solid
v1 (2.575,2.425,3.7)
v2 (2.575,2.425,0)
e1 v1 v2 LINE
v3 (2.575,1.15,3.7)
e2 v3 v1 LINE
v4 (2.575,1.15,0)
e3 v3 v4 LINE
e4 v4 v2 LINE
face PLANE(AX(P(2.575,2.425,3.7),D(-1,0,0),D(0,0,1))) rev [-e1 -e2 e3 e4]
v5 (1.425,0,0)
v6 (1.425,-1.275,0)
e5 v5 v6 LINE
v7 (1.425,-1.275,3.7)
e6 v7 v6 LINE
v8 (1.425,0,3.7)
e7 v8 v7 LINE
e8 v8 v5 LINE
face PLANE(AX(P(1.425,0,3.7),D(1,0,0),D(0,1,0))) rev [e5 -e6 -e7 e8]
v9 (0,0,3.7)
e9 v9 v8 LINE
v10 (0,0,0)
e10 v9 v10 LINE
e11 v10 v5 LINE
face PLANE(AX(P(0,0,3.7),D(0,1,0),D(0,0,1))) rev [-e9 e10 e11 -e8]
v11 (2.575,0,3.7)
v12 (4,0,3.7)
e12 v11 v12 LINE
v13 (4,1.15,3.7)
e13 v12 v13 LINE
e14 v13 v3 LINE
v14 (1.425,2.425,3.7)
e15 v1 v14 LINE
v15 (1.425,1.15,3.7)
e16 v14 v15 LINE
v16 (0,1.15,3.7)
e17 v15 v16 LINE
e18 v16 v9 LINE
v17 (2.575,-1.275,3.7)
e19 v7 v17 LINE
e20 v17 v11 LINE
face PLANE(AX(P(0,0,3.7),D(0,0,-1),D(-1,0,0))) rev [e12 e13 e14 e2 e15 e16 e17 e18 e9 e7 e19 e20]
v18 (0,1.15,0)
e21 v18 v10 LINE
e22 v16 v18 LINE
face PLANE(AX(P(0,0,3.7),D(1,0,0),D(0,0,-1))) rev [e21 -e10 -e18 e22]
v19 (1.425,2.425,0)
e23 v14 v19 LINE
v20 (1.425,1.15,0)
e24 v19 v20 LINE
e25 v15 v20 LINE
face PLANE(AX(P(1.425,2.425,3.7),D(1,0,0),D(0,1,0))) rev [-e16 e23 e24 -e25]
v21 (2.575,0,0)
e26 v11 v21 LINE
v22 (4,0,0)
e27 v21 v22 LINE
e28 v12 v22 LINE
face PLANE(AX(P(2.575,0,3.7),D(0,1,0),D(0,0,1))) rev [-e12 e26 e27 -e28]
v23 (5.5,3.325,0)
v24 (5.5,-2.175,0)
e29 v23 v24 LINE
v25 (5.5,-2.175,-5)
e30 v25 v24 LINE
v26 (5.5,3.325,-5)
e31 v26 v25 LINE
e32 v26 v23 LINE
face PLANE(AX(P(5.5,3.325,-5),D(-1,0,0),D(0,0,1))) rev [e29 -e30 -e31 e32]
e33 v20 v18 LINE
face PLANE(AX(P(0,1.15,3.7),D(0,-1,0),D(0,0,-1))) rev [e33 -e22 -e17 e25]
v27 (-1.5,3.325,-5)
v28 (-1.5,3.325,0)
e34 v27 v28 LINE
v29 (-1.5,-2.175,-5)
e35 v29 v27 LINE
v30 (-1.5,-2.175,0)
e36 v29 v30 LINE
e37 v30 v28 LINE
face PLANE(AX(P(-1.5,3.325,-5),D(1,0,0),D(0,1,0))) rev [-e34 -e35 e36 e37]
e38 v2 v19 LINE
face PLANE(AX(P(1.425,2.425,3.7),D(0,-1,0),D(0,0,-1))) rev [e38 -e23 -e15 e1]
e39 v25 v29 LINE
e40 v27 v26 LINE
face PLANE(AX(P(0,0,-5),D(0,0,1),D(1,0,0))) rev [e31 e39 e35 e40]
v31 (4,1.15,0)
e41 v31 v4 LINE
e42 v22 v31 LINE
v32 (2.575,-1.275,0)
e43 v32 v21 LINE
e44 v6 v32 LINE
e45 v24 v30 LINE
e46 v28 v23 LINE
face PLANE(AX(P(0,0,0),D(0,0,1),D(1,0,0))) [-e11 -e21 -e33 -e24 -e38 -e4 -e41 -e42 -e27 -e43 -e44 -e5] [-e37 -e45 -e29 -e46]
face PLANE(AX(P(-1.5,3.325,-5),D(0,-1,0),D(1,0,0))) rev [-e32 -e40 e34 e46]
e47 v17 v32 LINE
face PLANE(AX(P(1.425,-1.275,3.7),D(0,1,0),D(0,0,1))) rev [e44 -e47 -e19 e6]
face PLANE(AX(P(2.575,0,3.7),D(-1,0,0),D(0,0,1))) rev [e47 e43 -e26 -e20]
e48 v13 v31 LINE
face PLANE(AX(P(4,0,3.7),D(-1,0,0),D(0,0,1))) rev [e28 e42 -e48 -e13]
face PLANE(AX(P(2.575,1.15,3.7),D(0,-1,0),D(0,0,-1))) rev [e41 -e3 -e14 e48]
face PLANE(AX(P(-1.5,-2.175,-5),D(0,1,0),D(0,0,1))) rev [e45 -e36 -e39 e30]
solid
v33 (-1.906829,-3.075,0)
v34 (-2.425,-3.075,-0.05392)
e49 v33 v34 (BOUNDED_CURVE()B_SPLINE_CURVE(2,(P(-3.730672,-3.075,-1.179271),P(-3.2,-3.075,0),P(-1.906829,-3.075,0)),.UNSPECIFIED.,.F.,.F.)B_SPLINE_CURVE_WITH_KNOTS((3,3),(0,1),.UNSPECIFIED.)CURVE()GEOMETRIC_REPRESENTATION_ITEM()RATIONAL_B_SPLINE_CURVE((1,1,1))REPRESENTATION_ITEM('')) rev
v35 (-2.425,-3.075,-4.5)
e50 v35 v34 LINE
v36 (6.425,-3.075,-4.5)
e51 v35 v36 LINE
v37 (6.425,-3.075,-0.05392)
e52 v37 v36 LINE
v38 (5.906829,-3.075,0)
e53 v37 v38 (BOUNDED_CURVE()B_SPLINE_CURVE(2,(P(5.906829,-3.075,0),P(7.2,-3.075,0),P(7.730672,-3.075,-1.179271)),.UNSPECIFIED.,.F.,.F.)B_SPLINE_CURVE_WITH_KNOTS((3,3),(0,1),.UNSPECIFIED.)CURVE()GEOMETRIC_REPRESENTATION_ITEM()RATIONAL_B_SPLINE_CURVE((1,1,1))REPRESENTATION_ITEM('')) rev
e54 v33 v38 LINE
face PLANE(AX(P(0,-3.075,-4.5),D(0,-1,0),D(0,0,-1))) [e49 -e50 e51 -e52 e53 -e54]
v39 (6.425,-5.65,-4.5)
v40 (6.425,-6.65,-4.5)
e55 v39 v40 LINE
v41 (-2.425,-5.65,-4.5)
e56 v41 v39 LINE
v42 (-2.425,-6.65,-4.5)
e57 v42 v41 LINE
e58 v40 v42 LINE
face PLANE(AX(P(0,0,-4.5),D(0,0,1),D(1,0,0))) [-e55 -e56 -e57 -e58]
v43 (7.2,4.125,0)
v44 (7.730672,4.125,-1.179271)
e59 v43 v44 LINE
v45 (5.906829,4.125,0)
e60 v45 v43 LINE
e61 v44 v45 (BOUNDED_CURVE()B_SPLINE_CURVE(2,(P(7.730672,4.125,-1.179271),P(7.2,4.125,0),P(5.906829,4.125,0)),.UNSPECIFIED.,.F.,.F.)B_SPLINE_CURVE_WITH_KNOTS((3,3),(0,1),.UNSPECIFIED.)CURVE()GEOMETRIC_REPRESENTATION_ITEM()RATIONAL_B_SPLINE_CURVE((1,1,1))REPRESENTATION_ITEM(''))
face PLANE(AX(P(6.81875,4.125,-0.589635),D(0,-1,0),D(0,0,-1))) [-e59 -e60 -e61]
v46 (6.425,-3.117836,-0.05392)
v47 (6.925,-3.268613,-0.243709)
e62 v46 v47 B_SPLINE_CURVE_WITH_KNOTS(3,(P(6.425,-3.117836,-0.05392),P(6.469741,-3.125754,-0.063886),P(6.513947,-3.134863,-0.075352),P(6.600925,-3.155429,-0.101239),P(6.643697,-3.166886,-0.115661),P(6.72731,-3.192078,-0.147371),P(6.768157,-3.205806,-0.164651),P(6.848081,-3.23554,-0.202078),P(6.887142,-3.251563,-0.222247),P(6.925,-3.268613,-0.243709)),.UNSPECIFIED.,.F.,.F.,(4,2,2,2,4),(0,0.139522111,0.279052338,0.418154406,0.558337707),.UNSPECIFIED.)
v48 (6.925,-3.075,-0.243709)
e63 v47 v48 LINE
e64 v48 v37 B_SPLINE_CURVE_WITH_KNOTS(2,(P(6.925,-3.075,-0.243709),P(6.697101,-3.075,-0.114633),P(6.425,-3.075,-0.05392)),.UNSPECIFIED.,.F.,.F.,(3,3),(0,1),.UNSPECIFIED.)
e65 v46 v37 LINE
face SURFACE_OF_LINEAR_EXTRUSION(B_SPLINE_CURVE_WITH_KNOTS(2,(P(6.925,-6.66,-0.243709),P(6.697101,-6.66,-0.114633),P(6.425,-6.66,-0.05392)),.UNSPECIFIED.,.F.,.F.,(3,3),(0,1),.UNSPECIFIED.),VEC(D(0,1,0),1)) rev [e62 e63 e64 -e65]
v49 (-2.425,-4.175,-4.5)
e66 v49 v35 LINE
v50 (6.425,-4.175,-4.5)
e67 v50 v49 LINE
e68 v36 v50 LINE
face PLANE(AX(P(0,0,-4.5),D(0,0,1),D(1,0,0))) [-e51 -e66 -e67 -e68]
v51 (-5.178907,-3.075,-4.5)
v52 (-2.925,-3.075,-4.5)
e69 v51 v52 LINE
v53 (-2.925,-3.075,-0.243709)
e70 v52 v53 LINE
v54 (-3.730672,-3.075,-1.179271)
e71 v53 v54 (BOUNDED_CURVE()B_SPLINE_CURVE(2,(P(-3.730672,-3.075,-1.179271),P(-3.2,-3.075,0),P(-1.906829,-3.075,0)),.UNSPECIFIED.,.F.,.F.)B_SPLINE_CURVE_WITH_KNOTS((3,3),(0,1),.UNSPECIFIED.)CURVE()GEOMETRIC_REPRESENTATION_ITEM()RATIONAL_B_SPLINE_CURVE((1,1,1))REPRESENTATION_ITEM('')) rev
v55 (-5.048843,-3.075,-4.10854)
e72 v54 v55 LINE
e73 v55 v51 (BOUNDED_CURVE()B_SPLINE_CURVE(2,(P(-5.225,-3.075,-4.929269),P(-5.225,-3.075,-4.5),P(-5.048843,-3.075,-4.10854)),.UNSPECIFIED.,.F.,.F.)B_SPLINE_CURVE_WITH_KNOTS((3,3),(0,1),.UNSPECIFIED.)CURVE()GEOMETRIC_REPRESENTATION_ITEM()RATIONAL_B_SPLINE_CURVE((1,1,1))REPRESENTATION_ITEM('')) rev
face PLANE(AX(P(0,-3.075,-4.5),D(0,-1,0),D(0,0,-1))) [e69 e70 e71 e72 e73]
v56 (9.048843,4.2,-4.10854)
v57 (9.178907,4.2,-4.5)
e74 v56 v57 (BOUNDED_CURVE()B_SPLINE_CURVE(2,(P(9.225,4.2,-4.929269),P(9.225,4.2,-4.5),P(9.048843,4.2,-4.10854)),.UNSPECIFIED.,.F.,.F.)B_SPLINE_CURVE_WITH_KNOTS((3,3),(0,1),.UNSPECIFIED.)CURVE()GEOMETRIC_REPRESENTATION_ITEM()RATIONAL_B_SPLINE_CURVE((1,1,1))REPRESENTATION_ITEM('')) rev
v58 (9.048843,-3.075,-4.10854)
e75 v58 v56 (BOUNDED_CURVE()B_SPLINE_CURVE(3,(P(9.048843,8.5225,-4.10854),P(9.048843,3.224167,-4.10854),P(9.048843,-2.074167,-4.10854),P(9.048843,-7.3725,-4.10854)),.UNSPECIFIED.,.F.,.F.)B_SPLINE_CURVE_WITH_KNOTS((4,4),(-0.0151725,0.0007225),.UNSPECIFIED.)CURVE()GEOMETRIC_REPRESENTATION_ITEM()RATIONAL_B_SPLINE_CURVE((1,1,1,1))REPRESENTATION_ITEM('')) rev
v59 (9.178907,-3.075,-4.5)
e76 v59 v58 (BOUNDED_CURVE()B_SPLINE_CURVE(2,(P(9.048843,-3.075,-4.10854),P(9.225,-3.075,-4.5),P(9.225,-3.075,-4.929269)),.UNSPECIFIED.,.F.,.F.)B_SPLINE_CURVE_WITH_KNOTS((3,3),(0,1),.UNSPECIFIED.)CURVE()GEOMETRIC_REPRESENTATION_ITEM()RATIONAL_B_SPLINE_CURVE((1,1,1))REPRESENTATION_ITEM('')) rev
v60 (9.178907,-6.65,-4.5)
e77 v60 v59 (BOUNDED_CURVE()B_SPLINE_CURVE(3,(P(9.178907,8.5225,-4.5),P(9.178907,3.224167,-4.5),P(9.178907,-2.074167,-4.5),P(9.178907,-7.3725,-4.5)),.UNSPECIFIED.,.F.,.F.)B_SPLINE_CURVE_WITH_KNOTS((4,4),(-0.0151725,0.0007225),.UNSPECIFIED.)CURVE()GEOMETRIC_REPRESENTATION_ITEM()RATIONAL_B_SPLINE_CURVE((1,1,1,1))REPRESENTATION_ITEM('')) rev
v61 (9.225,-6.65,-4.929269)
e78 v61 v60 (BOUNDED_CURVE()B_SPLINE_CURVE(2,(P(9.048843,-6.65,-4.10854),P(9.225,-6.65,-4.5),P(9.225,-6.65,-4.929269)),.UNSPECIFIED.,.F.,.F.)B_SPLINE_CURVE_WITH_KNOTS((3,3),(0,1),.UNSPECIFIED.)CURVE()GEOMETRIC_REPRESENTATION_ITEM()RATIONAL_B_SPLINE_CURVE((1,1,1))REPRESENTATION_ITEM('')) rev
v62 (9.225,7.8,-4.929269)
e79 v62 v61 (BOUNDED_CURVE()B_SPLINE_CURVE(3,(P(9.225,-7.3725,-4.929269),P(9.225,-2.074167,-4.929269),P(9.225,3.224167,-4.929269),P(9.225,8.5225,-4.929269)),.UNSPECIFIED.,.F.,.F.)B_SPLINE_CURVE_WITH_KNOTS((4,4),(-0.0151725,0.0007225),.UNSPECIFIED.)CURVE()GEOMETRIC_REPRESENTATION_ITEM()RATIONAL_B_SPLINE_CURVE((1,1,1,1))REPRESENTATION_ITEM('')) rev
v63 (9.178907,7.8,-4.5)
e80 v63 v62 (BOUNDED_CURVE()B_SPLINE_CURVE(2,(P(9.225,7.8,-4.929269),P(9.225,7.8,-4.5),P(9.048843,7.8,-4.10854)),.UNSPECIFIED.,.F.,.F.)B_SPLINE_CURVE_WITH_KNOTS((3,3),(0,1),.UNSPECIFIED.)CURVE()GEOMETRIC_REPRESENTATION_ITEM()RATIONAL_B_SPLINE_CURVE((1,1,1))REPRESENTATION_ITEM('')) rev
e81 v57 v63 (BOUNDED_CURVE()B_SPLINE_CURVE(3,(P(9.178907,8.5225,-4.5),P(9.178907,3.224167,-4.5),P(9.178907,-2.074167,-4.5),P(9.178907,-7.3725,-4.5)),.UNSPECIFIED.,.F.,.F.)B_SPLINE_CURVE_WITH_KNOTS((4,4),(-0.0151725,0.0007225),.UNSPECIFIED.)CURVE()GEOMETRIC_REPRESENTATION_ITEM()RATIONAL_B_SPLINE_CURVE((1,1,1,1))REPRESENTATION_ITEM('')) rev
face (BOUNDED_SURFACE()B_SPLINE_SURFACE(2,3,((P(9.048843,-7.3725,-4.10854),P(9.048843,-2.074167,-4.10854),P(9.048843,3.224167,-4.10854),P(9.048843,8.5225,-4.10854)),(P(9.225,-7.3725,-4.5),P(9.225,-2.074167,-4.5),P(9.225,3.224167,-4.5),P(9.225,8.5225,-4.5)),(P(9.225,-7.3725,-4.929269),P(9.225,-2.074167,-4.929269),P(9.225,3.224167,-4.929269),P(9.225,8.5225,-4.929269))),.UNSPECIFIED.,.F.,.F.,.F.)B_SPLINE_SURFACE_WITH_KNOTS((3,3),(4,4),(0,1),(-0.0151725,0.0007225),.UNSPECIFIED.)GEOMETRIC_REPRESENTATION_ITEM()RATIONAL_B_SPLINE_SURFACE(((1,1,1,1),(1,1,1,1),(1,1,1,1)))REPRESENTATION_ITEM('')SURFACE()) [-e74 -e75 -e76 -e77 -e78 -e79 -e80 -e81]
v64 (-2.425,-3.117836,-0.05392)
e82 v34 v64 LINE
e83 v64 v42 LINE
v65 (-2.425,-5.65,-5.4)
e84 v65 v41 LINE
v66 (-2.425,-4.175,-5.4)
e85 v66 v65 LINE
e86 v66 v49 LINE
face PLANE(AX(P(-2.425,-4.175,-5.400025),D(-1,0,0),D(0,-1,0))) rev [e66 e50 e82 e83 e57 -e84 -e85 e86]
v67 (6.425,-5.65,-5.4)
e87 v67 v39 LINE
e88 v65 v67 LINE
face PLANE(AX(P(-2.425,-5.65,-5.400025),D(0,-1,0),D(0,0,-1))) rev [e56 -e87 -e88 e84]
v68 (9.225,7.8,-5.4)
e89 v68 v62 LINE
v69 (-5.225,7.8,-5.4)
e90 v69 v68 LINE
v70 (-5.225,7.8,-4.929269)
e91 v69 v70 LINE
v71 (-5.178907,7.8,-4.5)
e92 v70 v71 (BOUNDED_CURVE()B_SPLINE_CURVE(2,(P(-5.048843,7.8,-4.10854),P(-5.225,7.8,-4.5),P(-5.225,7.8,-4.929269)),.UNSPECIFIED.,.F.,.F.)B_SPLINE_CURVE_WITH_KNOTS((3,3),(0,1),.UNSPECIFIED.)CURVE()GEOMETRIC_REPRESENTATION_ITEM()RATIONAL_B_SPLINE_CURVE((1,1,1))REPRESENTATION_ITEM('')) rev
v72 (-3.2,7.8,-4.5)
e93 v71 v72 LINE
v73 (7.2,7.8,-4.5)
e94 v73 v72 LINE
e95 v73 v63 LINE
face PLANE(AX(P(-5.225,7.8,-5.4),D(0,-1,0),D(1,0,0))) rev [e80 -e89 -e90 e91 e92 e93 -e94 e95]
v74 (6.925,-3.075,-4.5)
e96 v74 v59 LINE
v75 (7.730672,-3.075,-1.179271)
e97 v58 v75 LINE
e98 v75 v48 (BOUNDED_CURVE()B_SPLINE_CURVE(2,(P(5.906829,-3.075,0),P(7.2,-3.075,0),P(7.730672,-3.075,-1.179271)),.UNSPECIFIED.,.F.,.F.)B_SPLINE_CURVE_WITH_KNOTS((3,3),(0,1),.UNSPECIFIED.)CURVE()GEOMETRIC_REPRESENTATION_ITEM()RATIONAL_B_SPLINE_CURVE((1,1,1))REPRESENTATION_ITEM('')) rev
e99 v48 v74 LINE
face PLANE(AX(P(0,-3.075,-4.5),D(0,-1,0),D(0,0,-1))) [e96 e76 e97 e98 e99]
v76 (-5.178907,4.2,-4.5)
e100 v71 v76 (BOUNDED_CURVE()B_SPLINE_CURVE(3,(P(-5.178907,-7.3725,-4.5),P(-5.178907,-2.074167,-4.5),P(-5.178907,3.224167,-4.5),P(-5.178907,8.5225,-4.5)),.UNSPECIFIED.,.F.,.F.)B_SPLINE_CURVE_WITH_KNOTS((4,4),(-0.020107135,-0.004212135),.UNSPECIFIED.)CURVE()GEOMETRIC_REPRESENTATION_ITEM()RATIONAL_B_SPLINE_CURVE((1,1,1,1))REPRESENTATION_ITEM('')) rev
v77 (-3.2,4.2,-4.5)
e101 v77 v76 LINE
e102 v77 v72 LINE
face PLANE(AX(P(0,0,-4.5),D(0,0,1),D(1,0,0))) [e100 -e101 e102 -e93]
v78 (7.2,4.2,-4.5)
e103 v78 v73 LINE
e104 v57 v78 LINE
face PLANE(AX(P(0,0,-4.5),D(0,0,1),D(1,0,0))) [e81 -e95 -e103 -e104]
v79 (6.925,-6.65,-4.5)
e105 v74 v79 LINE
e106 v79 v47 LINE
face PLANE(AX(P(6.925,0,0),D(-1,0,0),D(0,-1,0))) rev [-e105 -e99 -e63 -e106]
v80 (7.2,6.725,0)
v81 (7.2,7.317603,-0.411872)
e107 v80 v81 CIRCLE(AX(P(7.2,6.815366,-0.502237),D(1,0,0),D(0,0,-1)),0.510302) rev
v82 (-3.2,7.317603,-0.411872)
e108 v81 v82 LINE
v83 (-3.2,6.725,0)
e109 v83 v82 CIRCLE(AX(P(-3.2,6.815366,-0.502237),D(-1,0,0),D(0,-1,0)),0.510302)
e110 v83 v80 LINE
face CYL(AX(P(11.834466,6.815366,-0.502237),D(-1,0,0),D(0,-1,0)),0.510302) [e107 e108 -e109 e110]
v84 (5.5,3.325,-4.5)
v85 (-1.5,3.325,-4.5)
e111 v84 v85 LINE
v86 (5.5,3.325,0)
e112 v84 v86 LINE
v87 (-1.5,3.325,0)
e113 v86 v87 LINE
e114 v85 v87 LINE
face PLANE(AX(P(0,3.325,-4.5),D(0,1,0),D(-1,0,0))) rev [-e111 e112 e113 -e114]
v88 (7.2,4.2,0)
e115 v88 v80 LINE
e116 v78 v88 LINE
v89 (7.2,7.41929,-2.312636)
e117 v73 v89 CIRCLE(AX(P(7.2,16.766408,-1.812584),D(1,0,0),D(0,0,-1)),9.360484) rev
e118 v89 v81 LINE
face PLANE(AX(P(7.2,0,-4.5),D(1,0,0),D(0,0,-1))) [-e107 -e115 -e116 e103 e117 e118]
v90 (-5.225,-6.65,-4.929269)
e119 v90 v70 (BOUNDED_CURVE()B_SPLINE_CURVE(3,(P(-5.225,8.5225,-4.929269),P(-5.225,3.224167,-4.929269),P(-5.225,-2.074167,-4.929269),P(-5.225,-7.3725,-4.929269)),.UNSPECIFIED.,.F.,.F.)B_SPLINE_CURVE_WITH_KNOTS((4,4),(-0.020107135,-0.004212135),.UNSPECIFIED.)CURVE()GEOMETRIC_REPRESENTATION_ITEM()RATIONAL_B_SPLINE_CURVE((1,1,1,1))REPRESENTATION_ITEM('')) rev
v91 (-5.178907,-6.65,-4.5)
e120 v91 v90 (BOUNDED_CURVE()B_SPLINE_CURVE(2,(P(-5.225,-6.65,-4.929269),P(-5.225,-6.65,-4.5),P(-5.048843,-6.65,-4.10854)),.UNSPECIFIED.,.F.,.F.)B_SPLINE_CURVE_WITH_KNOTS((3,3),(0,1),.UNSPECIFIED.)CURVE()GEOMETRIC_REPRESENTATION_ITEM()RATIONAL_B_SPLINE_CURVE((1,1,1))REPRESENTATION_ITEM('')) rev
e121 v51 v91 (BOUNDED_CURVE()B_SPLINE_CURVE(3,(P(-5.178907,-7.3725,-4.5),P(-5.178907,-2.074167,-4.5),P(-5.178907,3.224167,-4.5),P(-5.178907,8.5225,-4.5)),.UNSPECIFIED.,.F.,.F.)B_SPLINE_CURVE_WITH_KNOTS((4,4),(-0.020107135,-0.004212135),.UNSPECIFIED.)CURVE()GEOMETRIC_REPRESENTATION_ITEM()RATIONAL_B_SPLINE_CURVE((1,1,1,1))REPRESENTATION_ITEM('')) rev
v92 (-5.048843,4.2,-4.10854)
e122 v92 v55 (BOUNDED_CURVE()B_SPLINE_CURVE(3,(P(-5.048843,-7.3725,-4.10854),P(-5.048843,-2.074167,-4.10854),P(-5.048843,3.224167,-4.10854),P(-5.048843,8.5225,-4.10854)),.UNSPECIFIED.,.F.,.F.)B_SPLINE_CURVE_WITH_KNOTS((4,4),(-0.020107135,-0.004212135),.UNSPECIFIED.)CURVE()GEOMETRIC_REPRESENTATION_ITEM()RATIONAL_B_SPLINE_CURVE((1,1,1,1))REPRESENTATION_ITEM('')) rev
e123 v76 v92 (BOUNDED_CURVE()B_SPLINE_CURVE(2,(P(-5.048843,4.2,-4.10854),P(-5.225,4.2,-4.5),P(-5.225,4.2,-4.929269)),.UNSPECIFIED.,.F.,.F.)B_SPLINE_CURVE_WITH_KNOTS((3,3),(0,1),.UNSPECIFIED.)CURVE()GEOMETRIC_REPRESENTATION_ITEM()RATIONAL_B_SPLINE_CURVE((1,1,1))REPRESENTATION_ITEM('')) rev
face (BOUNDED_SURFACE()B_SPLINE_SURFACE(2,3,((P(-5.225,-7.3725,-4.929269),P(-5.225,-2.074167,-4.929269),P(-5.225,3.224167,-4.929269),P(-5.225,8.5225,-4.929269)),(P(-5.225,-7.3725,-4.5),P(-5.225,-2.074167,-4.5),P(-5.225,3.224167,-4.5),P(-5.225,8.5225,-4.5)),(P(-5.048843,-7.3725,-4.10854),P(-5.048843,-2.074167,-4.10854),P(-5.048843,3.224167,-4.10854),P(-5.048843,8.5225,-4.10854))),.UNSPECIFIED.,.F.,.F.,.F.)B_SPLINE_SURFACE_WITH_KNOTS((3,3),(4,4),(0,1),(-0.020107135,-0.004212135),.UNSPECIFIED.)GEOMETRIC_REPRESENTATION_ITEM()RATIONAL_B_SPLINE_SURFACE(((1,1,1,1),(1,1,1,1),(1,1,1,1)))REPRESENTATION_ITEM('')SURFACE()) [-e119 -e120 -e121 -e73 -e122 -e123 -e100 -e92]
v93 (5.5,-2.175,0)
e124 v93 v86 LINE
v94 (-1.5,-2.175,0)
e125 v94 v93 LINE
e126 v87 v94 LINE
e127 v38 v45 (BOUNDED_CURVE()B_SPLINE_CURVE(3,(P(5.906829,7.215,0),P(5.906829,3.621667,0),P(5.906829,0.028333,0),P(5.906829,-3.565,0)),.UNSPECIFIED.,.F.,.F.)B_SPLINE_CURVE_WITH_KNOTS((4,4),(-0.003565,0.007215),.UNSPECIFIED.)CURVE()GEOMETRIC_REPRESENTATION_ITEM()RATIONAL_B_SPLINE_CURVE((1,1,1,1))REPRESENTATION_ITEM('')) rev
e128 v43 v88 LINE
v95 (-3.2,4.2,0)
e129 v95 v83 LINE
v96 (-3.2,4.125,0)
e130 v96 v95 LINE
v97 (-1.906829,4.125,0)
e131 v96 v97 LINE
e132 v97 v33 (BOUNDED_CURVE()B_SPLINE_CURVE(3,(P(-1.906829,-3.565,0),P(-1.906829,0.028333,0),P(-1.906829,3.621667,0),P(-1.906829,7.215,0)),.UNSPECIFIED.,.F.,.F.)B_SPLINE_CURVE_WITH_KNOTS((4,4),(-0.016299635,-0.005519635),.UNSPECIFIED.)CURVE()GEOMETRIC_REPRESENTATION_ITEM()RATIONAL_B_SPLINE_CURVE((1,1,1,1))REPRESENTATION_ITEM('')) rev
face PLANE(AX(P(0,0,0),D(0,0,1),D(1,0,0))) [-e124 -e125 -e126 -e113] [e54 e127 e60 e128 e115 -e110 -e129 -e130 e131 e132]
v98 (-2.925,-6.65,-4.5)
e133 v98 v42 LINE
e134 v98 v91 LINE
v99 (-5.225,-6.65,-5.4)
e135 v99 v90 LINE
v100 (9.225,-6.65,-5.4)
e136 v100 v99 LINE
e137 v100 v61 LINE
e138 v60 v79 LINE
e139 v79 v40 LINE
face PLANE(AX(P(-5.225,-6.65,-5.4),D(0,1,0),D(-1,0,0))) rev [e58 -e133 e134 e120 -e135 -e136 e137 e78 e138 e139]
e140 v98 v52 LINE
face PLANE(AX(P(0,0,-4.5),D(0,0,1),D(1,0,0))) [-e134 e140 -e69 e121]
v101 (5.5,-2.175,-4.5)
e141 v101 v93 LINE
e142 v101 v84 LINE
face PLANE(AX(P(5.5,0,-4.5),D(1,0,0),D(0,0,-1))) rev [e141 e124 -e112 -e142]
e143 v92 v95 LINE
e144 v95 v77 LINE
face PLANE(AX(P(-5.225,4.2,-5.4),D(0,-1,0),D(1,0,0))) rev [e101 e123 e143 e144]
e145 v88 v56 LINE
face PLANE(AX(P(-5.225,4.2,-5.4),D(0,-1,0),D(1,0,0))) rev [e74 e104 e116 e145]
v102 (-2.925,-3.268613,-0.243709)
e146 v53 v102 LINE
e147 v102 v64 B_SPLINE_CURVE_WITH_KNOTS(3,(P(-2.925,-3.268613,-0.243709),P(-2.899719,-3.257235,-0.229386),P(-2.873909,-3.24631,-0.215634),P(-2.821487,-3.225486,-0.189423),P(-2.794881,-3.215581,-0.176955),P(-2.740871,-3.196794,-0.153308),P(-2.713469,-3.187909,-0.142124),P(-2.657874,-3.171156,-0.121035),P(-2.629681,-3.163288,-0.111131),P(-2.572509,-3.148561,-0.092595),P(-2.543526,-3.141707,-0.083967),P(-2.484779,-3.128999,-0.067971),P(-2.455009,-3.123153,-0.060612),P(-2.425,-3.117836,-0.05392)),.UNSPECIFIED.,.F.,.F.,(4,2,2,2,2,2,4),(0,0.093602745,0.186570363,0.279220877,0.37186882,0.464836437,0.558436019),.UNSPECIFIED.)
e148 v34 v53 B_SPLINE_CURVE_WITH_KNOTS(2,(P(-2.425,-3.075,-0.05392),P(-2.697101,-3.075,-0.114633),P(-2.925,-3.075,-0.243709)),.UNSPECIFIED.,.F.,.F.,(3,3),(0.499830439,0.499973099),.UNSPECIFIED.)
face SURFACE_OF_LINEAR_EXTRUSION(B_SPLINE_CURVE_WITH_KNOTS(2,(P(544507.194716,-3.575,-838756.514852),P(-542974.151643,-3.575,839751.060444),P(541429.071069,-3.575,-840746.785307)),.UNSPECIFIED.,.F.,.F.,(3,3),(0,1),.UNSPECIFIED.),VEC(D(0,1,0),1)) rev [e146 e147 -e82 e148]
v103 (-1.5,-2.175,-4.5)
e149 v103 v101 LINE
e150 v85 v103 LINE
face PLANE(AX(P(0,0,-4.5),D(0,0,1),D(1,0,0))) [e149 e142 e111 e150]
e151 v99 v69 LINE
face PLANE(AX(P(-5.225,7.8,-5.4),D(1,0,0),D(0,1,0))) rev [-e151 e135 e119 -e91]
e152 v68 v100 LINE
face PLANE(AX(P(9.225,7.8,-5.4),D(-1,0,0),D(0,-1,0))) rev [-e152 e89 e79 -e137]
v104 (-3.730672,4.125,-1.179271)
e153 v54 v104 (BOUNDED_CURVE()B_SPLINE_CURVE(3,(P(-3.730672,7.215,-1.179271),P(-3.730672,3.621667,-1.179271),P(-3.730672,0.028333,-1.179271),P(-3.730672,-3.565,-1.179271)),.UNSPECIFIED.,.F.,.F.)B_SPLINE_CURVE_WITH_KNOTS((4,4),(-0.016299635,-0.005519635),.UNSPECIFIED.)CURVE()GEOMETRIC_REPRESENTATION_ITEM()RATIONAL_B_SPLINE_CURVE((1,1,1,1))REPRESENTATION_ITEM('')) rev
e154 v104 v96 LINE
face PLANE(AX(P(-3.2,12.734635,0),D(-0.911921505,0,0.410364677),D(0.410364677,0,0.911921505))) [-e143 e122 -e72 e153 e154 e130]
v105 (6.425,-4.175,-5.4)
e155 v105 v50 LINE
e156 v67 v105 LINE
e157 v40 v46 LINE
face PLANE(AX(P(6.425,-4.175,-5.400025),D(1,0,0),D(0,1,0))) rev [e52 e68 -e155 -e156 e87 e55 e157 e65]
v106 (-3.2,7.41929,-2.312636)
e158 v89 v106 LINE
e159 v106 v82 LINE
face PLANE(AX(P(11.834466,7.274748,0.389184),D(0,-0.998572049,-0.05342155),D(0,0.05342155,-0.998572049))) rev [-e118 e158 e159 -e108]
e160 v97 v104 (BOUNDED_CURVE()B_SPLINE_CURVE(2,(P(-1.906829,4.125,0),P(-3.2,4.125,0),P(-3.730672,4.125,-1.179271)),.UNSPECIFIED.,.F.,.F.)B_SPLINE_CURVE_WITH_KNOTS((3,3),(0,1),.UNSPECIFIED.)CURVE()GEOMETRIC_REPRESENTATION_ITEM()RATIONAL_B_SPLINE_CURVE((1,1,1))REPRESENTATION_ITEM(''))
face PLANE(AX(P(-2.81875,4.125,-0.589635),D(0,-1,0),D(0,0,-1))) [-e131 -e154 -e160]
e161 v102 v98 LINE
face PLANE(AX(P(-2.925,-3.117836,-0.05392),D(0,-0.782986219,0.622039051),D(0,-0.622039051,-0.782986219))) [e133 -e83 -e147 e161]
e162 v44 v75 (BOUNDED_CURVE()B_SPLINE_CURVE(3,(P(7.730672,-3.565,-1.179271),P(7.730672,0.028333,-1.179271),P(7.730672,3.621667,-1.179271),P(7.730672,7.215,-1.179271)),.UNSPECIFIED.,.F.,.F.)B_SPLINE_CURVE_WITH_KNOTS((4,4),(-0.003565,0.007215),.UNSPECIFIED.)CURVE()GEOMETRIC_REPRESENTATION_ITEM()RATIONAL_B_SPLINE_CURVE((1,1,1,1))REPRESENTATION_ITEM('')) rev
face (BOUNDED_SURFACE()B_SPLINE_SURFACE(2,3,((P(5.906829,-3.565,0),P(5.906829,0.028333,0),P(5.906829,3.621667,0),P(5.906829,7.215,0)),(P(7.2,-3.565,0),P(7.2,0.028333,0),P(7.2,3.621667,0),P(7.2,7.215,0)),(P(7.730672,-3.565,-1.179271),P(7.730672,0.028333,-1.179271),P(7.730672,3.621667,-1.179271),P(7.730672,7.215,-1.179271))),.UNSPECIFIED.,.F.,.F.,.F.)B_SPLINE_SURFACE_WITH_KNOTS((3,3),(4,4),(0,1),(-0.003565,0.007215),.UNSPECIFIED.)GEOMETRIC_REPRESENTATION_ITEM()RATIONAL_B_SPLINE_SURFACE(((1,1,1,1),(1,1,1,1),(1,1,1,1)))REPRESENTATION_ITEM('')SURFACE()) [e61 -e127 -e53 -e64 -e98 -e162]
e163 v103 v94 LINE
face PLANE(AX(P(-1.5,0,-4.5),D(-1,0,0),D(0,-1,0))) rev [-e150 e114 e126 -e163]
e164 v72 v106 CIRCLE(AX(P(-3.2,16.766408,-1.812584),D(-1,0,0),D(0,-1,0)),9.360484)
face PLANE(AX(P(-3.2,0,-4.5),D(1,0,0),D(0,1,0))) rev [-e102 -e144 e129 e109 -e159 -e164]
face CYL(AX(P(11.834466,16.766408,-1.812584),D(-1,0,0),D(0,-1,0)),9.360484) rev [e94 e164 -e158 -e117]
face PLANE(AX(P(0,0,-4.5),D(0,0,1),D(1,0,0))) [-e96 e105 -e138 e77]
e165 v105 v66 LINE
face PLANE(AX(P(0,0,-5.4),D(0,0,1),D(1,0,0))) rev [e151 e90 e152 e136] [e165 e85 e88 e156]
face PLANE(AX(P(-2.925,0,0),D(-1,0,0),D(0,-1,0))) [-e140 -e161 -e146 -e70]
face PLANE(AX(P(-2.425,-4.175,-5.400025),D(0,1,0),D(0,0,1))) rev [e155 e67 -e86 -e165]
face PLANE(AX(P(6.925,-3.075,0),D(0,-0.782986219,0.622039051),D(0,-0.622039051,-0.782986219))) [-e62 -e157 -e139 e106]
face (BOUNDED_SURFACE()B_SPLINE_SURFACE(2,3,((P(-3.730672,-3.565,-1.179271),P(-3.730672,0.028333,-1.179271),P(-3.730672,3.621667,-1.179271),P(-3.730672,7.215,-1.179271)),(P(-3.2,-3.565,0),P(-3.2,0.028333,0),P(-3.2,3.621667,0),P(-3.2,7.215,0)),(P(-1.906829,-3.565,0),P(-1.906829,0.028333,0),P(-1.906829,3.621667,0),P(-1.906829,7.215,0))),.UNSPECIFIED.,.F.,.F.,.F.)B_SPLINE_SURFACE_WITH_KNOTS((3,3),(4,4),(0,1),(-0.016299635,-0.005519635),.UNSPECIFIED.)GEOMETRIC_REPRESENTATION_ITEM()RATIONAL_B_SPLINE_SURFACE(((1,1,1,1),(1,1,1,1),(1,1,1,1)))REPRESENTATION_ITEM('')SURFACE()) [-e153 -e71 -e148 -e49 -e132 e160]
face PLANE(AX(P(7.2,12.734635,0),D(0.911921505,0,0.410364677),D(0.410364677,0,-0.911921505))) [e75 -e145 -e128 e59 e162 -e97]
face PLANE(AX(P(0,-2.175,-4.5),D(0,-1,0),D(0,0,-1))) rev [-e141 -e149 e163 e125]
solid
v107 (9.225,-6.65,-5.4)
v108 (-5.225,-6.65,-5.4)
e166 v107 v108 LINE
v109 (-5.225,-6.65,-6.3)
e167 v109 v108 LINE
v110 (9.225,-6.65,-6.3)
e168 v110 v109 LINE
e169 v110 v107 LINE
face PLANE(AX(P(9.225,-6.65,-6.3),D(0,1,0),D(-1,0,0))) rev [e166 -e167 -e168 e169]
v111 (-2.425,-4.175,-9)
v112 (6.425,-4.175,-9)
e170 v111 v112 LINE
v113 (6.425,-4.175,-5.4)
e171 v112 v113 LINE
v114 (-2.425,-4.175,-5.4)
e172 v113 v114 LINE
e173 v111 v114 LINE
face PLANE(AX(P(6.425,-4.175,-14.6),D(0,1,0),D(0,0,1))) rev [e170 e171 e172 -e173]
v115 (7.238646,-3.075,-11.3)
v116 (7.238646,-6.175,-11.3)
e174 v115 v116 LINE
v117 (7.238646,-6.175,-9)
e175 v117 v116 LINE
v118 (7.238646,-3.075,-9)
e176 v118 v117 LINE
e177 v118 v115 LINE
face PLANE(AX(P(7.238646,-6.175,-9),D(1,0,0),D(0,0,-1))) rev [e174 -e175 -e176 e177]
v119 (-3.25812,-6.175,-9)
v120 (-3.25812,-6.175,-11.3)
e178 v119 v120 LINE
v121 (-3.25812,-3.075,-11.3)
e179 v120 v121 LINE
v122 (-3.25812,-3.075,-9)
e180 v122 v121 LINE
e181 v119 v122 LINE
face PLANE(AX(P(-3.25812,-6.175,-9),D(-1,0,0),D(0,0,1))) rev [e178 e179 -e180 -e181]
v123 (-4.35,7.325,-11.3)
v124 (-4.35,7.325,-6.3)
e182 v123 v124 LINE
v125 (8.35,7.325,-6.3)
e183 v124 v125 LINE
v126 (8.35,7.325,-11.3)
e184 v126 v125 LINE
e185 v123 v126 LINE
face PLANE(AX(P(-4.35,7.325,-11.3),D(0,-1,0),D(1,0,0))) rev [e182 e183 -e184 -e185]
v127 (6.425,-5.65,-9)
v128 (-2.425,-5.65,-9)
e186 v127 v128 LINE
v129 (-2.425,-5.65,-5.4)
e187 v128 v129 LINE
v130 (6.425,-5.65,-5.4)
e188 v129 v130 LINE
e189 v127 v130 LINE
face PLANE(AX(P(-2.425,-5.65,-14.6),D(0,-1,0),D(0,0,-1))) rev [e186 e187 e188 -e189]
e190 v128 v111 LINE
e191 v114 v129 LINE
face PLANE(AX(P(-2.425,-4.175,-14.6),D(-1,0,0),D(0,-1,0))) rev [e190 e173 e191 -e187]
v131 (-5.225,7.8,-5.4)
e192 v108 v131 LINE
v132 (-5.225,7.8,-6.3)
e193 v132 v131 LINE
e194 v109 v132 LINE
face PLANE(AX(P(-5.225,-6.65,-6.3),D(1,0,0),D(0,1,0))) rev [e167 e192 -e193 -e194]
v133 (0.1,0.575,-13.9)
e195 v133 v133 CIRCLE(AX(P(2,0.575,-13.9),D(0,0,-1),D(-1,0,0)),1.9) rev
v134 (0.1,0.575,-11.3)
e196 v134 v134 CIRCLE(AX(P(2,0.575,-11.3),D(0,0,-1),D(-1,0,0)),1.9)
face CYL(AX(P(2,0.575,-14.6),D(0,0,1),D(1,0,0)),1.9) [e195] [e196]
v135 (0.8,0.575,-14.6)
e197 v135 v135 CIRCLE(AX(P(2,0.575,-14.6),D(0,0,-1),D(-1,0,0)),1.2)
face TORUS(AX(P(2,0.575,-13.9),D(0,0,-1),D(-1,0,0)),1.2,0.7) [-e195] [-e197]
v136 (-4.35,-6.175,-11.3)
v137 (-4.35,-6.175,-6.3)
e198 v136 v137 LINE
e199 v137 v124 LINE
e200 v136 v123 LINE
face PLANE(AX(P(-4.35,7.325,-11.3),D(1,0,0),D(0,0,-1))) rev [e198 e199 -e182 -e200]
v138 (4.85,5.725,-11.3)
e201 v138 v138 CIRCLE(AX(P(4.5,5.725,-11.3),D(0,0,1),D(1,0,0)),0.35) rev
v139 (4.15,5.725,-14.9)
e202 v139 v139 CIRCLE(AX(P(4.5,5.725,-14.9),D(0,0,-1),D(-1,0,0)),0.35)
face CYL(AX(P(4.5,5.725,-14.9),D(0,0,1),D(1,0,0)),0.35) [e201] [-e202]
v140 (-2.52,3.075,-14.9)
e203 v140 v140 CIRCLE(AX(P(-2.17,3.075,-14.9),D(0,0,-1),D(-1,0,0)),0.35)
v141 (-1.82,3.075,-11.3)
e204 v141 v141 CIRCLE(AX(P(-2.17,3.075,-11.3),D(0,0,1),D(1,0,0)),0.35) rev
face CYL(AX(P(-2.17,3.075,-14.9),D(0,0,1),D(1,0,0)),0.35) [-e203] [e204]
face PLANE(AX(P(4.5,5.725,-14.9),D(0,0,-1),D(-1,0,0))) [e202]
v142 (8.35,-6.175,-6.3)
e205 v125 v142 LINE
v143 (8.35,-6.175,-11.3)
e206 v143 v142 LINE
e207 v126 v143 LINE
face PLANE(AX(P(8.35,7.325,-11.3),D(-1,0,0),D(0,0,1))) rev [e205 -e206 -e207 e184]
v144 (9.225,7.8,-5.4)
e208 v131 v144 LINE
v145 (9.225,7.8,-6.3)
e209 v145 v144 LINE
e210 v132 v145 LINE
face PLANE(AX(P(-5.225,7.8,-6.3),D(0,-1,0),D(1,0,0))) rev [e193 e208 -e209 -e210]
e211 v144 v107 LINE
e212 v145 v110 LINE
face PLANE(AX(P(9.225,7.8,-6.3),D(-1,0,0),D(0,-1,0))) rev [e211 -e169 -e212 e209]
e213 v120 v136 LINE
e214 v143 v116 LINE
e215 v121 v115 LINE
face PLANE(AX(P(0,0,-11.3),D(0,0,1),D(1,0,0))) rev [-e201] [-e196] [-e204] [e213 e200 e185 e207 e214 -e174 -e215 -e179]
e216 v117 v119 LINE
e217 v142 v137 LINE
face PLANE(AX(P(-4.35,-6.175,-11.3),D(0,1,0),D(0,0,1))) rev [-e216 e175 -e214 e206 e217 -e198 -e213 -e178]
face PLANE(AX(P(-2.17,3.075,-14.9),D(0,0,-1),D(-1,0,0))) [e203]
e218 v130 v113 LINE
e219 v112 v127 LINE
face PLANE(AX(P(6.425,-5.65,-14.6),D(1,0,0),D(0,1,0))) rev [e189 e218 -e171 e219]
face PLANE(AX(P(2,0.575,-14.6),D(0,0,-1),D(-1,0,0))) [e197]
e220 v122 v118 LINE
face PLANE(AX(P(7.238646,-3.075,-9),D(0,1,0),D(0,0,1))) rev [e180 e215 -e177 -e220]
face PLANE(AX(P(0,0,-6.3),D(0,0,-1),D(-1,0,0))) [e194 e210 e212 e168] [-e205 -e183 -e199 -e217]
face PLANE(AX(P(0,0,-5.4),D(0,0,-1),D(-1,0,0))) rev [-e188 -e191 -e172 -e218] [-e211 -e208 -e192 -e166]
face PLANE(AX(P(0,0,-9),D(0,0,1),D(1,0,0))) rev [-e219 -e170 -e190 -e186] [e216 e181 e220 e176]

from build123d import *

# Parameters (mm, degrees)
BOSS_EXTRUDE1_DEPTH  = 3.7
SKETCH2_W            = 7
SKETCH2_H            = 5.5
BOSS_EXTRUDE2_DEPTH  = 5
SKETCH3_W            = 7
SKETCH3_H            = 3.4
BOSS_EXTRUDE3_DEPTH  = 4.5
SKETCH4_W            = 14.45
SKETCH4_H            = 14.45
BOSS_EXTRUDE4_DEPTH  = 0.9
BOSS_EXTRUDE5_DEPTH  = 10.4
BOSS_EXTRUDE6_DEPTH  = 7.275
FILLET3_START        = -8
FILLET3_DEPTH        = 12.125
FILLET3_START_2      = 4.125
FILLET3_2_DEPTH      = 4.875
SKETCH8_W            = 8.85
SKETCH8_H            = 1.475
CUT_EXTRUDE1_DEPTH   = 15.600706435
BOSS_EXTRUDE7_DEPTH  = 0.5
CUT_EXTRUDE2_DEPTH   = 16.248811596
BOSS_EXTRUDE8_DEPTH  = 0.5
CUT_EXTRUDE3_DEPTH   = 0.5
SKETCH13_W           = 14.45
SKETCH13_H           = 14.45
BOSS_EXTRUDE9_DEPTH  = 0.9
SKETCH14_W           = 12.7
SKETCH14_H           = 13.5
BOSS_EXTRUDE10_DEPTH = 5
SKETCH15_R           = 1.9
BOSS_EXTRUDE11_DEPTH = 3.3
FILLET4_R            = 0.7
SKETCH16_W           = 8.85
SKETCH16_H           = 1.475
CUT_EXTRUDE4_DEPTH   = 16.184881574
SKETCH17_W           = 10.496766354
SKETCH17_H           = 3.1
CUT_EXTRUDE5_DEPTH   = 2.3
SKETCH18_R           = 0.35
BOSS_EXTRUDE12_DEPTH = 3.6


with BuildPart() as part:
    # Sketch1 → Boss-Extrude1 (new body)
    with BuildSketch(Plane.XY):
        Polygon((0, 0), (1.425, 0), (1.425, -1.275), (2.575, -1.275), (2.575, 0), (4, 0), (4, 1.15), (2.575, 1.15), (2.575, 2.425), (1.425, 2.425), (1.425, 1.15), (0, 1.15), align=None)
    extrude(amount=BOSS_EXTRUDE1_DEPTH)

    # Sketch2 → Boss-Extrude2 (add)
    with BuildSketch(Plane(origin=(0, 0, 0), x_dir=(-1, 0, 0), z_dir=(0, 0, -1))):
        with Locations((-2, 0.575)):
            Rectangle(SKETCH2_W, SKETCH2_H)
    extrude(amount=BOSS_EXTRUDE2_DEPTH)


with BuildPart() as body_2:
    # Sketch3 → Boss-Extrude3 (new body)
    with BuildSketch(Plane.XY):
        Polygon((-3.2, 6.725), (-3.2, -2.175), (-1.5, -2.175), (-1.5, 3.325), (-1.5, 6.725), align=None)
        Polygon((-3.2, -2.175), (-3.2, -3.075), (7.2, -3.075), (7.2, -2.175), (5.5, -2.175), (-1.5, -2.175), align=None)
        Polygon((5.5, -2.175), (7.2, -2.175), (7.2, 6.725), (5.5, 6.725), (5.5, 3.325), align=None)
        with Locations((2, 5.025)):
            Rectangle(SKETCH3_W, SKETCH3_H)
    extrude(amount=-BOSS_EXTRUDE3_DEPTH)



with BuildPart() as body_3:
    # Sketch4 → Boss-Extrude4 (new body)
    with BuildSketch(Plane(origin=(0, 0, -4.5), x_dir=(-1, 0, 0), z_dir=(0, 0, -1))):
        with Locations((-2, 0.575)):
            Rectangle(SKETCH4_W, SKETCH4_H)
    extrude(amount=BOSS_EXTRUDE4_DEPTH)


with BuildPart() as body_2_1:
    add(body_2.part)

    add(body_3.part)  # Boss-Extrude5 merges body 3
    # Sketch6 → Boss-Extrude5 (add)
    with BuildSketch(Plane.ZY.offset(3.2)):
        with BuildLine():
            Line((-0.411871522, 7.317602539), (-2.312635971, 7.419289526))
            ThreePointArc((-2.312635971, 7.419289526), (-3.417645725, 7.544561473), (-4.5, 7.8))
            Line((-4.5, 7.8), (-4.5, 6.725))
            Line((-4.5, 6.725), (0, 6.725))
            ThreePointArc((0, 6.725), (-0.083203757, 7.106602655), (-0.411871522, 7.317602539))
        make_face()
    extrude(amount=-BOSS_EXTRUDE5_DEPTH)

    # Sketch7 → Boss-Extrude6 (add)
    with BuildSketch(Plane.XZ.offset(3.075)):
        Polygon((7.2, 0), (9.225, -4.5), (7.2, -4.5), align=None)
        Polygon((-3.2, 0), (-5.225, -4.5), (-3.2, -4.5), align=None)
    extrude(amount=-BOSS_EXTRUDE6_DEPTH)

    # Fillet3: read off the stored shape, not the designer's step
    # Fillet3 outline → Fillet3 (cut)
    with BuildSketch(Plane(origin=(0, 0, 0), x_dir=(1, 0, 0), z_dir=(0, 1, 0)).offset(FILLET3_START)):
        with BuildLine():
            Line((-5.225, 4.5), (-5.04884301, 4.108540023))
            add(Edge.make_bspline(
                [(-5.225, 4.929269378), (-5.225, 4.5), (-5.04884301, 4.108540023)],
                knots=[0, 0, 0, 1, 1, 1], degree=2))
            Line((-5.225, 4.929269378), (-5.225, 4.5))
        make_face()
        with BuildLine():
            Line((-3.2, 0), (-1.90682878, 0))
            add(Edge.make_bspline(
                [(-3.73067179, 1.179270645), (-3.2, 0), (-1.90682878, 0)],
                knots=[0, 0, 0, 1, 1, 1], degree=2))
            Line((-3.73067179, 1.179270645), (-3.2, 0))
        make_face()
        with BuildLine():
            Line((7.2, 0), (7.73067179, 1.179270645))
            add(Edge.make_bspline(
                [(5.90682878, 0), (7.2, 0), (7.73067179, 1.179270645)],
                knots=[0, 0, 0, 1, 1, 1], degree=2))
            Line((5.90682878, 0), (7.2, 0))
        make_face()
        with BuildLine():
            add(Edge.make_bspline(
                [(9.04884301, 4.108540023), (9.225, 4.5), (9.225, 4.929269378)],
                knots=[0, 0, 0, 1, 1, 1], degree=2))
            Line((9.04884301, 4.108540023), (9.225, 4.5))
            Line((9.225, 4.5), (9.225, 4.929269378))
        make_face()
    extrude(amount=FILLET3_DEPTH, mode=Mode.SUBTRACT)

    # Fillet3 2 outline → Fillet3 2 (cut)
    with BuildSketch(Plane(origin=(0, 0, 0), x_dir=(1, 0, 0), z_dir=(0, 1, 0)).offset(FILLET3_START_2)):
        with BuildLine():
            Line((-5.225, 4.5), (-5.04884301, 4.108540023))
            add(Edge.make_bspline(
                [(-5.225, 4.929269378), (-5.225, 4.5), (-5.04884301, 4.108540023)],
                knots=[0, 0, 0, 1, 1, 1], degree=2))
            Line((-5.225, 4.929269378), (-5.225, 4.5))
        make_face()
        with BuildLine():
            add(Edge.make_bspline(
                [(9.04884301, 4.108540023), (9.225, 4.5), (9.225, 4.929269378)],
                knots=[0, 0, 0, 1, 1, 1], degree=2))
            Line((9.04884301, 4.108540023), (9.225, 4.5))
            Line((9.225, 4.5), (9.225, 4.929269378))
        make_face()
    extrude(amount=FILLET3_2_DEPTH, mode=Mode.SUBTRACT)

    # Sketch8 → Cut-Extrude1 (cut, through all)
    with BuildSketch(Plane.XY.offset(-4.5)):
        with Locations((2, -4.9125)):
            Rectangle(SKETCH8_W, SKETCH8_H)
    extrude(amount=-CUT_EXTRUDE1_DEPTH, mode=Mode.SUBTRACT)

    # Sketch9 → Boss-Extrude7 (add)
    with BuildSketch(Plane.ZY.offset(-6.425)):
        Polygon((0, -3.075), (-4.5, -6.65), (-4.5, -3.075), align=None)
    extrude(amount=-BOSS_EXTRUDE7_DEPTH)

    # Sketch10 → Cut-Extrude2 (cut, through all)
    with BuildSketch(Plane(origin=(0, -3.075, 0), x_dir=(1, 0, 0), z_dir=(0, 1, 0))):
        with BuildLine():
            Line((6.925, 0), (6.925, 0.243708852))
            add(Edge.make_bspline(
                [(6.925, 0.243708852), (6.697101215, 0.114632789), (6.425, 0.053919569)],
                knots=[0, 0, 0, 1, 1, 1], degree=2))
            Line((6.425, 0.053919569), (6.425, 0))
            Line((6.425, 0), (6.925, 0))
        make_face()
    extrude(amount=-CUT_EXTRUDE2_DEPTH, mode=Mode.SUBTRACT)

    # Sketch11 → Boss-Extrude8 (add)
    with BuildSketch(Plane(origin=(-2.425, 0, 0), x_dir=(0, 0, -1), z_dir=(1, 0, 0))):
        Polygon((0.053919569, -3.117836102), (4.5, -6.65), (4.5, -5.65), (5.4, -5.65), (5.4, -4.175), (4.5, -4.175), (4.5, -3.075), (0.053919569, -3.075), align=None)
    extrude(amount=-BOSS_EXTRUDE8_DEPTH)

    # Sketch12 → Cut-Extrude3 (cut)
    with BuildSketch(Plane(origin=(0, -3.075, 0), x_dir=(1, 0, 0), z_dir=(0, 1, 0))):
        with BuildLine():
            Line((-2.925, 0.053919569), (-2.425, 0.053919569))
            add(Edge.make_bspline(
                [(-2.425, 0.053919569), (-2.697101223, 0.114632791), (-2.925000013, 0.24370886)],
                knots=[0, 0, 0, 1, 1, 1], degree=2))
            Line((-2.925000013, 0.24370886), (-2.925, 0.053919569))
        make_face()
    extrude(amount=-CUT_EXTRUDE3_DEPTH, mode=Mode.SUBTRACT)


with BuildPart() as body_3_2:
    # Sketch13 → Boss-Extrude9 (new body)
    with BuildSketch(Plane(origin=(0, 0, -5.4), x_dir=(-1, 0, 0), z_dir=(0, 0, -1))):
        with Locations((-2, 0.575)):
            Rectangle(SKETCH13_W, SKETCH13_H)
    extrude(amount=BOSS_EXTRUDE9_DEPTH)

    # Sketch14 → Boss-Extrude10 (add)
    with BuildSketch(Plane(origin=(0, 0, -6.3), x_dir=(-1, 0, 0), z_dir=(0, 0, -1))):
        with Locations((-2, 0.575)):
            Rectangle(SKETCH14_W, SKETCH14_H)
    extrude(amount=BOSS_EXTRUDE10_DEPTH)

    # Sketch15 → Boss-Extrude11 (add)
    with BuildSketch(Plane(origin=(0, 0, -11.3), x_dir=(-1, 0, 0), z_dir=(0, 0, -1))):
        with Locations((-2, 0.575)):
            Circle(SKETCH15_R)
    extrude(amount=BOSS_EXTRUDE11_DEPTH)

    # Fillet4
    fillet4_edges = [body_3_2.edges().sort_by_distance(p)[0] for p in [
        (3.9, 0.575, -14.6),
    ]]
    fillet(fillet4_edges, radius=FILLET4_R)

    # Sketch16 → Cut-Extrude4 (cut, through all)
    with BuildSketch(Plane.XY.offset(-5.4)):
        with Locations((2, -4.9125)):
            Rectangle(SKETCH16_W, SKETCH16_H)
    extrude(amount=-CUT_EXTRUDE4_DEPTH, mode=Mode.SUBTRACT)

    # Sketch17 → Cut-Extrude5 (cut)
    with BuildSketch(Plane(origin=(0, 0, -11.3), x_dir=(-1, 0, 0), z_dir=(0, 0, -1))):
        with Locations((-1.99026274, -4.625)):
            Rectangle(SKETCH17_W, SKETCH17_H)
    extrude(amount=-CUT_EXTRUDE5_DEPTH, mode=Mode.SUBTRACT)

    # Sketch18 → Boss-Extrude12 (add)
    with BuildSketch(Plane(origin=(0, 0, -11.3), x_dir=(-1, 0, 0), z_dir=(0, 0, -1))):
        with Locations(Location((-4.5, 5.725, 0), (0, 0, 180))):
            Circle(SKETCH18_R)
        with Locations(Location((2.17, 3.075, 0), (0, 0, 180))):
            Circle(SKETCH18_R)
    extrude(amount=BOSS_EXTRUDE12_DEPTH)


solid = Compound([part.part, body_2_1.part, body_3_2.part])
